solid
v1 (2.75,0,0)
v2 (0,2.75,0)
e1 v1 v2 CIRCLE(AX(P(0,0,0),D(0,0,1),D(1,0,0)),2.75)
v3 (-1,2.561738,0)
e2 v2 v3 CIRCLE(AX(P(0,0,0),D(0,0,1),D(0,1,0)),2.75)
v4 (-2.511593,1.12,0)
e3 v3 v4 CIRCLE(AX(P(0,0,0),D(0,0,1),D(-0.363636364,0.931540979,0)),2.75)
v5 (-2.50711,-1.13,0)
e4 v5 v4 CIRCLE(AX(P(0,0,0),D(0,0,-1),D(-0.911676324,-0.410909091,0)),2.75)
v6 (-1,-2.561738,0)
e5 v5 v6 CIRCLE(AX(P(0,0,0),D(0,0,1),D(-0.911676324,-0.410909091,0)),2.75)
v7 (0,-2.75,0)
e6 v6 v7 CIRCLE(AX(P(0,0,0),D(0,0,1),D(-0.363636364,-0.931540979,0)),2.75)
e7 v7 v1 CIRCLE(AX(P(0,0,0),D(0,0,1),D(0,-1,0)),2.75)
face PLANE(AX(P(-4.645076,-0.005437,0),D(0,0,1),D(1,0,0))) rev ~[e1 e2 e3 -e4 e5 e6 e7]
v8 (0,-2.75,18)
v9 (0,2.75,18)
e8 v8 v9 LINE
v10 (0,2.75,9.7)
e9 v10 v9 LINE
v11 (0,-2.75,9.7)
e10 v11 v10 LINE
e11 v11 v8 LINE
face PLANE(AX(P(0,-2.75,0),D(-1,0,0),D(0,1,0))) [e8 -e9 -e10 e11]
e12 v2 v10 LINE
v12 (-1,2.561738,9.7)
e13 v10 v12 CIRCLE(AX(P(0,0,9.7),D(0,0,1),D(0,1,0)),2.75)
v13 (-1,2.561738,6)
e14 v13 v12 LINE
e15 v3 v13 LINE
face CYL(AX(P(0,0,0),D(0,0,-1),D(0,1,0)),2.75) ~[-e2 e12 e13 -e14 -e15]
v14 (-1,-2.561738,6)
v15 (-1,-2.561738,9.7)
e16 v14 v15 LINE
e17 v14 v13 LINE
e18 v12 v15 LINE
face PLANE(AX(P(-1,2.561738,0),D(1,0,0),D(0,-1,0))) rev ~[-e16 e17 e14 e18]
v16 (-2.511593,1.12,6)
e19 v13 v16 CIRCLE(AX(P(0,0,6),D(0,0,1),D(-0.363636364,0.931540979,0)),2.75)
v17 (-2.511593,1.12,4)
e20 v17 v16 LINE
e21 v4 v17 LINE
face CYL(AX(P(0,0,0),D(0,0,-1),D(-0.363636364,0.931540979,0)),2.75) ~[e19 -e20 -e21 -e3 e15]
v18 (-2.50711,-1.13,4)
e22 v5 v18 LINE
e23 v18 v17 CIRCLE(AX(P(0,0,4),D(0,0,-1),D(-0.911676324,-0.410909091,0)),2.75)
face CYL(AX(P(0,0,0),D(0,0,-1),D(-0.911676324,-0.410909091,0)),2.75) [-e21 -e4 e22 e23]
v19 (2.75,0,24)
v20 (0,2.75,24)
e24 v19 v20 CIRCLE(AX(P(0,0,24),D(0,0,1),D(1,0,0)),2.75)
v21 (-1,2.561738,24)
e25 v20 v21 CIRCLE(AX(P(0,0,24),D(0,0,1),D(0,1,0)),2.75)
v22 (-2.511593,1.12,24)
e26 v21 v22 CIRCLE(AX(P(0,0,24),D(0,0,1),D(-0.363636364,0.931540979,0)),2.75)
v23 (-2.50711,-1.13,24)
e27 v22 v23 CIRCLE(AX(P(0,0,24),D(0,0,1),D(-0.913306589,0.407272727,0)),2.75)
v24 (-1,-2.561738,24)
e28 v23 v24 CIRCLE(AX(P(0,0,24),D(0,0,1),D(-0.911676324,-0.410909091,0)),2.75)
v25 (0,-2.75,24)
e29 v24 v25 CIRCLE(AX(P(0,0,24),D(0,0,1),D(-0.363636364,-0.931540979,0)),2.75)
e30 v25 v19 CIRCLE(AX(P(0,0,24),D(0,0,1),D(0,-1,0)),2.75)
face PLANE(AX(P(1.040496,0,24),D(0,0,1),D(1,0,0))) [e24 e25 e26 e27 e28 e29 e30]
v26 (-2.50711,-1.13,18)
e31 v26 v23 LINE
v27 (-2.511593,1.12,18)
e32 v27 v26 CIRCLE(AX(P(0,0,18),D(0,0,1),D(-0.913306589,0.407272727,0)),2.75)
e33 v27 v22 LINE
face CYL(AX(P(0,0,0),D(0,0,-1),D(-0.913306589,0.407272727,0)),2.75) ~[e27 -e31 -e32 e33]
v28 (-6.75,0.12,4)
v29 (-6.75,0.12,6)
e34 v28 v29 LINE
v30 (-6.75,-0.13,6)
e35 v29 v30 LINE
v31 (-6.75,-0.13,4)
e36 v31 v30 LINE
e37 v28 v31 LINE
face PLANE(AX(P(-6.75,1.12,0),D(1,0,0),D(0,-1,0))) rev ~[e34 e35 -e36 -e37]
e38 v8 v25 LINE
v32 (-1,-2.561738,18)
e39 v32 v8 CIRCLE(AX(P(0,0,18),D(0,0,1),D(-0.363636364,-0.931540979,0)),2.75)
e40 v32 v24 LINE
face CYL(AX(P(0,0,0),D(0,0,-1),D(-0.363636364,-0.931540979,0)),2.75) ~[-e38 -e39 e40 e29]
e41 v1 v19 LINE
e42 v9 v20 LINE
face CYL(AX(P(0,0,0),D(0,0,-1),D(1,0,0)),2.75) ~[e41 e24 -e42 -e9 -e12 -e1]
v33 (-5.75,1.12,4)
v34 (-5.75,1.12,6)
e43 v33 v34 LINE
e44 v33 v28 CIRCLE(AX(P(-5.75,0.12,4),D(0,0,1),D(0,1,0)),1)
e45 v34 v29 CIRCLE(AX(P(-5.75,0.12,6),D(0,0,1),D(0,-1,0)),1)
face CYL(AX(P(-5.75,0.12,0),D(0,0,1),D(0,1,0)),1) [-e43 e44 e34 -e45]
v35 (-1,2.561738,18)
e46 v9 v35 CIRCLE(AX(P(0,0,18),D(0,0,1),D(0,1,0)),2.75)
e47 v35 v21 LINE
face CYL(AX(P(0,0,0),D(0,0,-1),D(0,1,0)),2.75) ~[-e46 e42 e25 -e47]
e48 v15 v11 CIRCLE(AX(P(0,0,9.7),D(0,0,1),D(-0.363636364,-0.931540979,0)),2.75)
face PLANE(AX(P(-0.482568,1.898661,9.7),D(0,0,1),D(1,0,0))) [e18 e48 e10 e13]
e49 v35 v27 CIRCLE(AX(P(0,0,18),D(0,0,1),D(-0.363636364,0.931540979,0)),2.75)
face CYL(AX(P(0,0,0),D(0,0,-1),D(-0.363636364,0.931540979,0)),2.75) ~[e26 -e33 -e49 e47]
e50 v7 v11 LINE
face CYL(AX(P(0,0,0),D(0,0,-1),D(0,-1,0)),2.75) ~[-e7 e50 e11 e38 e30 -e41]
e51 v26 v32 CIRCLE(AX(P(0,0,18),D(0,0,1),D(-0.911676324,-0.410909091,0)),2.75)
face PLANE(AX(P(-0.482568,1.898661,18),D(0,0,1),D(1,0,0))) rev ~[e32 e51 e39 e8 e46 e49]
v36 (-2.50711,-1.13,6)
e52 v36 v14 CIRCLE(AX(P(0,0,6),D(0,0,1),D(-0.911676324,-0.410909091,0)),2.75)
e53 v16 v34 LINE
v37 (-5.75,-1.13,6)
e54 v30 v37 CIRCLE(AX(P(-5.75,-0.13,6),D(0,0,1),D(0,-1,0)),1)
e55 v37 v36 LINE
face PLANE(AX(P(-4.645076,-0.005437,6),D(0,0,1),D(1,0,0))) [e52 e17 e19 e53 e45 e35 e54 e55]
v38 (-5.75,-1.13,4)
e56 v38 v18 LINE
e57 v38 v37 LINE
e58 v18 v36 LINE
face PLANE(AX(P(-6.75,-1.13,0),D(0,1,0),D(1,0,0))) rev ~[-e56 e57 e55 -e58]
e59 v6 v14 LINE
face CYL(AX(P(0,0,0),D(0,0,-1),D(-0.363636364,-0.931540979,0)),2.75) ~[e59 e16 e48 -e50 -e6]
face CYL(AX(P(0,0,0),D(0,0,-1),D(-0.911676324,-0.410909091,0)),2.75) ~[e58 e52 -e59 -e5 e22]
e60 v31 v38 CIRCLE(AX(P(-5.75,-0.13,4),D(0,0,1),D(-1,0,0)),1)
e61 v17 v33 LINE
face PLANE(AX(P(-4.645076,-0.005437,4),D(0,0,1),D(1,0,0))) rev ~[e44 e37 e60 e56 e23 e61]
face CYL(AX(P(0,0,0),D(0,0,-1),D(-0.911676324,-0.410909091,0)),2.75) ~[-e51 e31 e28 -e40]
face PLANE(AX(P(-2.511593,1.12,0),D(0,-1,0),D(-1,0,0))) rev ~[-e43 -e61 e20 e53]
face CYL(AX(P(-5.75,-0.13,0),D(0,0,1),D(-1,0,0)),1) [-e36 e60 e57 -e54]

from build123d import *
from build123d import SkipClean  # not in build123d's __all__

# Parameters (mm, degrees)
F1_DEPTH = 24
F2_DEPTH = 18
F3_DEPTH = 9.7
F4_DEPTH = 6
F5_DEPTH = 6
F6_R     = 1
F7_DEPTH = 4


with BuildPart() as f1:
    # F0 (on Top) → F1 (new body)
    with BuildSketch(Plane.XY):
        with BuildLine():
            ThreePointArc((0, -2.75), (1.9445436483, -1.9445436483), (2.75, 0))
            ThreePointArc((2.75, 0), (1.9445436483, 1.9445436483), (0, 2.75))
            Line((0, 2.75), (0, 1.12))
            Line((0, 1.12), (0, 0))
            Line((0, 0), (0, -1.13))
            Line((0, -1.13), (0, -2.75))
        make_face()
        with BuildLine():
            Line((0, 1.12), (0, 2.75))
            ThreePointArc((0, 2.75), (-0.5087835239, 2.7025246208), (-1, 2.5617376915))
            Line((-1, 2.5617376915), (-1, 1.12))
            Line((-1, 1.12), (0, 1.12))
        make_face()
        with BuildLine():
            ThreePointArc((-1, -2.5617376915), (-0.5087835239, -2.7025246208), (0, -2.75))
            Line((0, -2.75), (0, -1.13))
            Line((0, -1.13), (-1, -1.13))
            Line((-1, -1.13), (-1, -2.5617376915))
        make_face()
        with BuildLine():
            Line((-1, 1.12), (-1, 2.5617376915))
            ThreePointArc((-1, 2.5617376915), (-1.8980182962, 1.9899815445), (-2.5115931199, 1.12))
            Line((-2.5115931199, 1.12), (-1, 1.12))
        make_face()
        Polygon((0, 0), (0, 1.12), (-1, 1.12), (-1, -1.13), (0, -1.13), align=None)
        with BuildLine():
            ThreePointArc((-2.5071098899, -1.13), (-1.8940494052, -1.9937594767), (-1, -2.5617376915))
            Line((-1, -2.5617376915), (-1, -1.13))
            Line((-1, -1.13), (-2.5071098899, -1.13))
        make_face()
        with BuildLine():
            Line((-1, 1.12), (-2.5115931199, 1.12))
            ThreePointArc((-2.5115931199, 1.12), (-2.7499945409, -0.0054794925), (-2.5071098899, -1.13))
            Line((-2.5071098899, -1.13), (-1, -1.13))
            Line((-1, -1.13), (-1, 1.12))
        make_face()
    extrude(amount=F1_DEPTH)

    # F0 (on Top) → F2 (cut)
    with BuildSketch(Plane.XY):
        with BuildLine():
            Line((0, 1.12), (0, 2.75))
            ThreePointArc((0, 2.75), (-0.5087835239, 2.7025246208), (-1, 2.5617376915))
            Line((-1, 2.5617376915), (-1, 1.12))
            Line((-1, 1.12), (0, 1.12))
        make_face()
        with BuildLine():
            ThreePointArc((-1, -2.5617376915), (-0.5087835239, -2.7025246208), (0, -2.75))
            Line((0, -2.75), (0, -1.13))
            Line((0, -1.13), (-1, -1.13))
            Line((-1, -1.13), (-1, -2.5617376915))
        make_face()
        with BuildLine():
            Line((-1, 1.12), (-1, 2.5617376915))
            ThreePointArc((-1, 2.5617376915), (-1.8980182962, 1.9899815445), (-2.5115931199, 1.12))
            Line((-2.5115931199, 1.12), (-1, 1.12))
        make_face()
        Polygon((0, 0), (0, 1.12), (-1, 1.12), (-1, -1.13), (0, -1.13), align=None)
        with BuildLine():
            ThreePointArc((-2.5071098899, -1.13), (-1.8940494052, -1.9937594767), (-1, -2.5617376915))
            Line((-1, -2.5617376915), (-1, -1.13))
            Line((-1, -1.13), (-2.5071098899, -1.13))
        make_face()
        with BuildLine():
            Line((-1, 1.12), (-2.5115931199, 1.12))
            ThreePointArc((-2.5115931199, 1.12), (-2.7499945409, -0.0054794925), (-2.5071098899, -1.13))
            Line((-2.5071098899, -1.13), (-1, -1.13))
            Line((-1, -1.13), (-1, 1.12))
        make_face()
    extrude(amount=F2_DEPTH, mode=Mode.SUBTRACT)

    # F0 (on Top) → F3 (join)
    with BuildSketch(Plane.XY):
        with BuildLine():
            Line((0, 1.12), (0, 2.75))
            ThreePointArc((0, 2.75), (-0.5087835239, 2.7025246208), (-1, 2.5617376915))
            Line((-1, 2.5617376915), (-1, 1.12))
            Line((-1, 1.12), (0, 1.12))
        make_face()
        with BuildLine():
            ThreePointArc((-1, -2.5617376915), (-0.5087835239, -2.7025246208), (0, -2.75))
            Line((0, -2.75), (0, -1.13))
            Line((0, -1.13), (-1, -1.13))
            Line((-1, -1.13), (-1, -2.5617376915))
        make_face()
        Polygon((0, 0), (0, 1.12), (-1, 1.12), (-1, -1.13), (0, -1.13), align=None)
    extrude(amount=F3_DEPTH)

    # F0 (on Top) → F4 (join)
    with BuildSketch(Plane.XY):
        with BuildLine():
            Line((-1, 1.12), (-1, 2.5617376915))
            ThreePointArc((-1, 2.5617376915), (-1.8980182962, 1.9899815445), (-2.5115931199, 1.12))
            Line((-2.5115931199, 1.12), (-1, 1.12))
        make_face()
        with BuildLine():
            ThreePointArc((-2.5071098899, -1.13), (-1.8940494052, -1.9937594767), (-1, -2.5617376915))
            Line((-1, -2.5617376915), (-1, -1.13))
            Line((-1, -1.13), (-2.5071098899, -1.13))
        make_face()
        with BuildLine():
            Line((-1, 1.12), (-2.5115931199, 1.12))
            ThreePointArc((-2.5115931199, 1.12), (-2.7499945409, -0.0054794925), (-2.5071098899, -1.13))
            Line((-2.5071098899, -1.13), (-1, -1.13))
            Line((-1, -1.13), (-1, 1.12))
        make_face()
    extrude(amount=F4_DEPTH)

    # F0 (on Top) → F5 (join)
    with BuildSketch(Plane.XY):
        with BuildLine():
            ThreePointArc((-2.5071098899, -1.13), (-2.7499945409, -0.0054794925), (-2.5115931199, 1.12))
            Line((-2.5115931199, 1.12), (-6.75, 1.12))
            Line((-6.75, 1.12), (-6.75, -1.13))
            Line((-6.75, -1.13), (-2.5071098899, -1.13))
        make_face()
    extrude(amount=F5_DEPTH)

    # F6
    f6_edges = [f1.edges().sort_by_distance(p)[0] for p in [
        (-6.75, 1.12, 3),
        (-6.75, -1.13, 3),
    ]]
    fillet(f6_edges, radius=F6_R)

    # F0 (on Top) → F7 (cut)
    with BuildSketch(Plane.XY):
        with BuildLine():
            ThreePointArc((-2.5071098899, -1.13), (-2.7499945409, -0.0054794925), (-2.5115931199, 1.12))
            Line((-2.5115931199, 1.12), (-6.75, 1.12))
            Line((-6.75, 1.12), (-6.75, -1.13))
            Line((-6.75, -1.13), (-2.5071098899, -1.13))
        make_face()
    with SkipClean():  # cleaning this boolean's faces spoils the solid; the shape is the same uncleaned
        extrude(amount=F7_DEPTH, mode=Mode.SUBTRACT)


solid = f1.part
